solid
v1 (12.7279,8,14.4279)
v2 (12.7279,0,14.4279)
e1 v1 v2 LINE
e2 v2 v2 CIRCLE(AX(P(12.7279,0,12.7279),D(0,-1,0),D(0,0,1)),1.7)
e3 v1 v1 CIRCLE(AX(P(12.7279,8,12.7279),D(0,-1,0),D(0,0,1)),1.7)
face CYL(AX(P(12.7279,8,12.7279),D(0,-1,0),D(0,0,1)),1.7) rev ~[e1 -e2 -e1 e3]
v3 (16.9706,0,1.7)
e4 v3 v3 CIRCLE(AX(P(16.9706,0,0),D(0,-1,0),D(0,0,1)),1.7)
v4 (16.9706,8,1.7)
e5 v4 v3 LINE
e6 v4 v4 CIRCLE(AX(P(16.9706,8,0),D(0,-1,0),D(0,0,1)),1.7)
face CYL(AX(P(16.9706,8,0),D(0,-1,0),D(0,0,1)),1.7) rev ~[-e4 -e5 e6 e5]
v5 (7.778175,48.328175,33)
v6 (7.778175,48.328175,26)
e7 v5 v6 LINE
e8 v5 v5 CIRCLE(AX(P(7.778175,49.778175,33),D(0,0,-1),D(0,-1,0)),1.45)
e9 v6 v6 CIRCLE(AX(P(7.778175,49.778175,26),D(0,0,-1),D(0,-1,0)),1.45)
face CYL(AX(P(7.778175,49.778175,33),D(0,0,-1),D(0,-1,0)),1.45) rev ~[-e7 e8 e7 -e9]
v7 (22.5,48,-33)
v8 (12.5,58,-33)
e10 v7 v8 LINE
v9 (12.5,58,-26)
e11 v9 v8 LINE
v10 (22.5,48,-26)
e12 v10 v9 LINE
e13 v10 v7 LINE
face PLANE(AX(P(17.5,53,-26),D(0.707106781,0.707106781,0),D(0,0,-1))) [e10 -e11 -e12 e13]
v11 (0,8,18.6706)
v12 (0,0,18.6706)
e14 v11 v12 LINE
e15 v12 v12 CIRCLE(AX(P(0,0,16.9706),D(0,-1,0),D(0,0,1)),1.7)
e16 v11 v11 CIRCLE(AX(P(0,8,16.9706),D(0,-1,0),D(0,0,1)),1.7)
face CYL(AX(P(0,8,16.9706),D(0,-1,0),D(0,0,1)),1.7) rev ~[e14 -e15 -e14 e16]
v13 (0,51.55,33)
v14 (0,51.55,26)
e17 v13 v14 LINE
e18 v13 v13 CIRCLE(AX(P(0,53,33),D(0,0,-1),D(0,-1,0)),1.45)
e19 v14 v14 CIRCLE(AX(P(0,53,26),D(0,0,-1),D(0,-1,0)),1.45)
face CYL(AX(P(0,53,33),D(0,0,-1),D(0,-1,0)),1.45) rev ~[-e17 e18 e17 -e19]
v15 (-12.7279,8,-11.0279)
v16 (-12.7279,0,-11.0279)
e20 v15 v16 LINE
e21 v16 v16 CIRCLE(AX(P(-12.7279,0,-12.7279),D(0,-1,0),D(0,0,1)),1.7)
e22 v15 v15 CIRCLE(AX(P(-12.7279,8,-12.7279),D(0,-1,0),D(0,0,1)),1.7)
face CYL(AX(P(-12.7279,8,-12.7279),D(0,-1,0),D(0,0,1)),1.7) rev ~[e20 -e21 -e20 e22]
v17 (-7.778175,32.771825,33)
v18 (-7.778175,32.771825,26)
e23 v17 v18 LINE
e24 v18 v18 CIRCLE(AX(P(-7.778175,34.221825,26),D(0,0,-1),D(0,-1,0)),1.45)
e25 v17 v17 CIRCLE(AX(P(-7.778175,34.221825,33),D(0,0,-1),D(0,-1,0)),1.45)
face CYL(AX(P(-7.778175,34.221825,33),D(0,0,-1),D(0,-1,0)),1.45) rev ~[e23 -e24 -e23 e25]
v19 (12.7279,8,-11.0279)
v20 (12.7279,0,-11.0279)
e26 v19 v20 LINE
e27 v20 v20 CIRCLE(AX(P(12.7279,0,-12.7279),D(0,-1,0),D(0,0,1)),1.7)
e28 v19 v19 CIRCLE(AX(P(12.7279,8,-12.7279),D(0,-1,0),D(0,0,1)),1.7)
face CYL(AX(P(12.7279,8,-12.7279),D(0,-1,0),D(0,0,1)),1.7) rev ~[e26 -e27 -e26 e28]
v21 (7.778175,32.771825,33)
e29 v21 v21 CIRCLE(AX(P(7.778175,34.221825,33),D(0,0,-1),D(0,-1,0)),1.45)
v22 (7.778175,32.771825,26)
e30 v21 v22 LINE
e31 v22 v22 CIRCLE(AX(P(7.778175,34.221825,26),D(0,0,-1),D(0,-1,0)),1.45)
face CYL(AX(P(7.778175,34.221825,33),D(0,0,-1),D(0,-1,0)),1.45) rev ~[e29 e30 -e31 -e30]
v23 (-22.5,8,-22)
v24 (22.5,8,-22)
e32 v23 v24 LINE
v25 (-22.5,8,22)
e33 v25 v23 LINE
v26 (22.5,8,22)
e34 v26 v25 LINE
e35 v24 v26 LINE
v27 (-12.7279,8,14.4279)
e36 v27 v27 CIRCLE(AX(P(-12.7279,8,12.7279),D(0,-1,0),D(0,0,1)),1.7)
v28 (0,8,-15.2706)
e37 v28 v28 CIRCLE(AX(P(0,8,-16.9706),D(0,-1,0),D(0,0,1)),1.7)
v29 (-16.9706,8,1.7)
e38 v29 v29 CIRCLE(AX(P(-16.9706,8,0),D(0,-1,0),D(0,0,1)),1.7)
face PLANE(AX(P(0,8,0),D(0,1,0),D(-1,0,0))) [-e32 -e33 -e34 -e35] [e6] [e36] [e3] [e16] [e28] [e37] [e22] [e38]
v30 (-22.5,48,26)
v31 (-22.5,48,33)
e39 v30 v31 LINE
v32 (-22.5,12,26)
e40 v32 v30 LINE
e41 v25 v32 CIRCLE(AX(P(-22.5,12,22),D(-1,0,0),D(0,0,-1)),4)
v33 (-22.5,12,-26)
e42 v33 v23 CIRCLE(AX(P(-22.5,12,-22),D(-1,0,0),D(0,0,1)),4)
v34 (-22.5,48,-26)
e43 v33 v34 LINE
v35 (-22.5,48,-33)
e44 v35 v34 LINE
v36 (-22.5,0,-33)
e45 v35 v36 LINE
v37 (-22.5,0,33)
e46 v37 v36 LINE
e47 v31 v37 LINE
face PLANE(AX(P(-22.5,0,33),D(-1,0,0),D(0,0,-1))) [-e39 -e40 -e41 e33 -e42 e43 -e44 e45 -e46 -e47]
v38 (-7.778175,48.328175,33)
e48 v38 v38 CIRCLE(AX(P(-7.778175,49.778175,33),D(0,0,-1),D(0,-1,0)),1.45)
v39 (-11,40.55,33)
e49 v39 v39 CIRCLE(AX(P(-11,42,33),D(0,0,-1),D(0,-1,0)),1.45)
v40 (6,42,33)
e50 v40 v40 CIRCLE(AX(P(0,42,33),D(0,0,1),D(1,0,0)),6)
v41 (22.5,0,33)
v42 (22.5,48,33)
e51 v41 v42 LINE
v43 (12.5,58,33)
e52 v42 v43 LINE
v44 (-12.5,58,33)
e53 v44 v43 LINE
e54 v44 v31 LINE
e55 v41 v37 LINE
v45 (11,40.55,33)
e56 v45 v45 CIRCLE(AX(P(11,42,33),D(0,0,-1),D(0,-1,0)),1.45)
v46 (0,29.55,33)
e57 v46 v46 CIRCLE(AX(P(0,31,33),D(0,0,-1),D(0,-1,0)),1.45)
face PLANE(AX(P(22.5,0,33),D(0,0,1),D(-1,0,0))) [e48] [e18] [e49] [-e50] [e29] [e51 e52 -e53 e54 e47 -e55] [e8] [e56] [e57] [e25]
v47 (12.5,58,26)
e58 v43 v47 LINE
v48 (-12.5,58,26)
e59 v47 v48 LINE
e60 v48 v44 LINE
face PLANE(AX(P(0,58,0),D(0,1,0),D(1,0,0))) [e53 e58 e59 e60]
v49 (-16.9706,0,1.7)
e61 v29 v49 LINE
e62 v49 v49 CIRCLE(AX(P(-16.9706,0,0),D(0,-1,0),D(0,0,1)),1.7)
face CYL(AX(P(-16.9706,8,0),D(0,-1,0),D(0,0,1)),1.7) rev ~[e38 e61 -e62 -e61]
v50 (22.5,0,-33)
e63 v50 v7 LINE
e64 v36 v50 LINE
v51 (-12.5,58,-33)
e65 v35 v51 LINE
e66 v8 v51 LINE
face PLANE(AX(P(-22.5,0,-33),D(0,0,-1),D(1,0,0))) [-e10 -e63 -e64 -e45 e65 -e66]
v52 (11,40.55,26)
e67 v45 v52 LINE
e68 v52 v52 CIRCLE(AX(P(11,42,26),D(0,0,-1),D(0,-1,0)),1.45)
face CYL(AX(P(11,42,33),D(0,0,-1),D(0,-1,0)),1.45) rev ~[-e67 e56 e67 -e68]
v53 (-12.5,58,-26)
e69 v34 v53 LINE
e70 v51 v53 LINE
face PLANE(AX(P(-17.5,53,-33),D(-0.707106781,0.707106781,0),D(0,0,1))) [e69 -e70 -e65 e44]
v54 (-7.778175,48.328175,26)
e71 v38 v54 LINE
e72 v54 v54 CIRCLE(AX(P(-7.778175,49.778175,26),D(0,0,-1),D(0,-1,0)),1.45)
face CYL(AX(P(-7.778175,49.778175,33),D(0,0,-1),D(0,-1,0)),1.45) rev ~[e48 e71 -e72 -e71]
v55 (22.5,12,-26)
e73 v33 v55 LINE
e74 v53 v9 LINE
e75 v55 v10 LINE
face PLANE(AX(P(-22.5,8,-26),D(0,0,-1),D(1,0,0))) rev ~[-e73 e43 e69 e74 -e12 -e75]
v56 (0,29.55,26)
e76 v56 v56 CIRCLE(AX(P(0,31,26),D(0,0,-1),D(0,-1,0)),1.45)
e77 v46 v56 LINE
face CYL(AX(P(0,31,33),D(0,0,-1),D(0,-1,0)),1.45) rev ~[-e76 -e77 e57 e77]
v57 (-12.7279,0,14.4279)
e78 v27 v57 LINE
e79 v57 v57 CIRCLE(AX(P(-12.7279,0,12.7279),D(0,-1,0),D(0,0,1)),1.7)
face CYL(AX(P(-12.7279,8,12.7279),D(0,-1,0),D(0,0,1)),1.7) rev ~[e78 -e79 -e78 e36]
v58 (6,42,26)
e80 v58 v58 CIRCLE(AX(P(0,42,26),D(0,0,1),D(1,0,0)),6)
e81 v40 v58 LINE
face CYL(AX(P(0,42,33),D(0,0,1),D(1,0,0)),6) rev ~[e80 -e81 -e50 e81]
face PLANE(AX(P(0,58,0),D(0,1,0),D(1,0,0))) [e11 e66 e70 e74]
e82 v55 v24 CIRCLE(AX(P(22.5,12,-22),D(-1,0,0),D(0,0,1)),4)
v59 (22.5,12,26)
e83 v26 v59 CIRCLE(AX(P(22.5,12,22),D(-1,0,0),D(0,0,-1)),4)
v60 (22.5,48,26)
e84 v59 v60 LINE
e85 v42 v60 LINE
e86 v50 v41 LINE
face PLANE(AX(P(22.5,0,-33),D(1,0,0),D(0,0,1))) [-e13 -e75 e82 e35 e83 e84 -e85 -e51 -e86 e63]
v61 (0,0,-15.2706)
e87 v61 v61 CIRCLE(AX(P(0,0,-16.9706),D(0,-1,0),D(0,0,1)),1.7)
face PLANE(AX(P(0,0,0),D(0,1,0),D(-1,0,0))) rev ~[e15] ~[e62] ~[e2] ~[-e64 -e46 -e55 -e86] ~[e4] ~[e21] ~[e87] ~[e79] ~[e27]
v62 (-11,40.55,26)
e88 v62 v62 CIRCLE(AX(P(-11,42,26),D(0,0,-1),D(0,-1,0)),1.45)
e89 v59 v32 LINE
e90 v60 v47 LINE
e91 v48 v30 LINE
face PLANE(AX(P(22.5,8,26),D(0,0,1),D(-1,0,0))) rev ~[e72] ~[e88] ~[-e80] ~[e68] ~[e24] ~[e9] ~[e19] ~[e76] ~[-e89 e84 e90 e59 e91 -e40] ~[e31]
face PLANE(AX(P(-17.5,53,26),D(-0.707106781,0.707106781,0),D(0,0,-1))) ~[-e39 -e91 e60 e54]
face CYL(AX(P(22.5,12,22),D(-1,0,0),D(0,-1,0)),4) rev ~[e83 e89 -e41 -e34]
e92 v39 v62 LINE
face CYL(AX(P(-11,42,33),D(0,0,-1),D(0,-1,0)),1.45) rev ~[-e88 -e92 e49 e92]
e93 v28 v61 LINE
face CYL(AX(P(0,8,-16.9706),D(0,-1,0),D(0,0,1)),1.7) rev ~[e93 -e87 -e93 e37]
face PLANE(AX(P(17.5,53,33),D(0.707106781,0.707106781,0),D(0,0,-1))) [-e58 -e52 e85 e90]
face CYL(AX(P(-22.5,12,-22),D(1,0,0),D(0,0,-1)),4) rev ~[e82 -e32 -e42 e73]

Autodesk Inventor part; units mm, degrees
ref_plane "YZ Plane" through (0, 0, 0) normal (1, 0, 0) x (0, 1, 0)
ref_plane "XZ Plane" through (0, 0, 0) normal (0, 1, 0) x (-1, 0, 0)
ref_plane "XY Plane" through (0, 0, 0) normal (0, 0, 1) x (1, 0, 0)
sketch "Skizze1" plane through (0, 0, 0) normal (0, 1, 0) x (-1, 0, 0)
  line L0 (-22.5, 33) -> (22.5, 33)
  line L1 (22.5, 33) -> (22.5, -33)
  line L2 (22.5, -33) -> (-22.5, -33)
  line L3 (-22.5, -33) -> (-22.5, 33)
  line L4 (-22.5, 33) -> (22.5, -33) construction
  line L5 (22.5, 33) -> (-22.5, -33) construction
  point P0 (0, 0)
  dimension "d0" = 45
  dimension "d1" = 66
extrude "Extrusion1" add sketch "Skizze1" along normal blind 8
sketch "Skizze2" plane through (0, 8, 0) normal (0, 1, 0) x (1, 0, 0)
  line L0 (-22.5, -33) -> (22.5, -33) projected
  line L1 (22.5, -33) -> (22.5, 33) projected
  line L2 (22.5, 33) -> (-22.5, 33) projected
  line L3 (-22.5, 33) -> (-22.5, -33) projected
  line L4 (-22.5, -33) -> (22.5, -33)
  line L5 (22.5, -33) -> (22.5, -26)
  line L6 (22.5, -26) -> (-22.5, -26)
  line L7 (-22.5, -26) -> (-22.5, -33)
  line L8 (22.5, 33) -> (-22.5, 33)
  line L9 (-22.5, 33) -> (-22.5, 26)
  line L10 (-22.5, 26) -> (22.5, 26)
  line L11 (22.5, 26) -> (22.5, 33)
  point P0 (0, 0)
  dimension "d4" = 7
  dimension "d5" = 7
extrude "Extrusion2" add sketch "Skizze2" along normal blind 50 contours L3 L6 L1 L0 | L3 L2 L1 L10
sketch "Skizze3" plane through (0, 8, 0) normal (0, 1, 0) x (1, 0, 0)
  line L0 (-22.5, -26) -> (22.5, -26) construction
  line L1 (22.5, -26) -> (22.5, 26) construction
  line L2 (22.5, 26) -> (-22.5, 26) construction
  line L3 (-22.5, 26) -> (-22.5, -26) construction
  line L4 (-22.5, -26) -> (22.5, 26) construction
  line L5 (-22.5, 26) -> (22.5, 26) construction
  line L6 (22.5, -26) -> (-22.5, 26) construction
  line L7 (16.9706, 0) -> (0, 16.9706) construction
  line L8 (0, 16.9706) -> (-16.9706, 0) construction
  line L9 (-16.9706, 0) -> (0, -16.9706) construction
  line L10 (0, -16.9706) -> (16.9706, 0) construction
  line L11 (16.9706, 0) -> (-16.9706, 0) construction
  line L12 (0, 16.9706) -> (0, -16.9706) construction
  circle A0 centre (0, 0) radius 18 construction
  line L13 (17.4913, 17.4913) -> (-17.5019, -17.5019) construction
  line L14 (16.4193, -16.4193) -> (-16.3603, 16.3603) construction
  point P0 (0, 0)
  point P1 (0, 0)
  point P2 (-12.7279, -12.7279)
  point P3 (12.7279, -12.7279)
  point P4 (12.7279, 12.7279)
  point P5 (-12.7279, 12.7279)
  dimension "d12" = 24
  dimension "d13" = 24
  dimension "d14" = 36
hole "Bohrung1" at (-16.9706, 8, 0) at (0, 8, -16.9706) at (16.9706, 8, 0) at (0, 8, 16.9706) at (-12.7279, 8, 12.7279) at (-12.7279, 8, -12.7279) at (12.7279, 8, -12.7279) at (12.7279, 8, 12.7279) direction (0, -1, 0) diameter 3.4 end through all clearance for "Inbusschraube ISO 4762" size "M3" standard "ISO"
sketch "Skizze4" plane through (-22.5, 0, 33) normal (0, 0, 1) x (1, 0, 0)
  line L0 (22.5, 0) -> (22.5, 74.8441) construction
  line L1 (0, 58) -> (45, 58) projected
  circle A0 centre (22.5, 42) radius 6
  line L2 (45, 0) -> (45, 52) projected
  line L3 (0, 52) -> (45, 52) projected
  line L4 (0, 0) -> (0, 52) projected
  point P0 (22.5, 53)
  dimension "d22" = 5
  dimension "d23" = 11
  dimension "d34" = 12
hole "Bohrung2" at (0, 53, 33) direction (0, 0, -1) diameter 2.9 end up to surface clearance for "Inbusschraube ISO 4762" size "M2.5" standard "ISO"
pattern_circular "Runde Anordnung1" count 8 over 360 about axis through (0, 42, 33) along (0, 0, 1) of "Bohrung2"
extrude "Extrusion3" cut sketch "Skizze4" against normal up to surface (7 mm away)
chamfer "Fase1" distance 10 angle 45 4 edges at (-22.5, 58, 29.5) (-22.5, 58, -29.5) (22.5, 58, 29.5) (22.5, 58, -29.5)
fillet "Rundung1" radius 4 2 edges at (0, 8, 26) (0, 8, -26)
equation "\"d4\" = d5"
properties part number "frame_mx108" material "Aluminium 6061"
